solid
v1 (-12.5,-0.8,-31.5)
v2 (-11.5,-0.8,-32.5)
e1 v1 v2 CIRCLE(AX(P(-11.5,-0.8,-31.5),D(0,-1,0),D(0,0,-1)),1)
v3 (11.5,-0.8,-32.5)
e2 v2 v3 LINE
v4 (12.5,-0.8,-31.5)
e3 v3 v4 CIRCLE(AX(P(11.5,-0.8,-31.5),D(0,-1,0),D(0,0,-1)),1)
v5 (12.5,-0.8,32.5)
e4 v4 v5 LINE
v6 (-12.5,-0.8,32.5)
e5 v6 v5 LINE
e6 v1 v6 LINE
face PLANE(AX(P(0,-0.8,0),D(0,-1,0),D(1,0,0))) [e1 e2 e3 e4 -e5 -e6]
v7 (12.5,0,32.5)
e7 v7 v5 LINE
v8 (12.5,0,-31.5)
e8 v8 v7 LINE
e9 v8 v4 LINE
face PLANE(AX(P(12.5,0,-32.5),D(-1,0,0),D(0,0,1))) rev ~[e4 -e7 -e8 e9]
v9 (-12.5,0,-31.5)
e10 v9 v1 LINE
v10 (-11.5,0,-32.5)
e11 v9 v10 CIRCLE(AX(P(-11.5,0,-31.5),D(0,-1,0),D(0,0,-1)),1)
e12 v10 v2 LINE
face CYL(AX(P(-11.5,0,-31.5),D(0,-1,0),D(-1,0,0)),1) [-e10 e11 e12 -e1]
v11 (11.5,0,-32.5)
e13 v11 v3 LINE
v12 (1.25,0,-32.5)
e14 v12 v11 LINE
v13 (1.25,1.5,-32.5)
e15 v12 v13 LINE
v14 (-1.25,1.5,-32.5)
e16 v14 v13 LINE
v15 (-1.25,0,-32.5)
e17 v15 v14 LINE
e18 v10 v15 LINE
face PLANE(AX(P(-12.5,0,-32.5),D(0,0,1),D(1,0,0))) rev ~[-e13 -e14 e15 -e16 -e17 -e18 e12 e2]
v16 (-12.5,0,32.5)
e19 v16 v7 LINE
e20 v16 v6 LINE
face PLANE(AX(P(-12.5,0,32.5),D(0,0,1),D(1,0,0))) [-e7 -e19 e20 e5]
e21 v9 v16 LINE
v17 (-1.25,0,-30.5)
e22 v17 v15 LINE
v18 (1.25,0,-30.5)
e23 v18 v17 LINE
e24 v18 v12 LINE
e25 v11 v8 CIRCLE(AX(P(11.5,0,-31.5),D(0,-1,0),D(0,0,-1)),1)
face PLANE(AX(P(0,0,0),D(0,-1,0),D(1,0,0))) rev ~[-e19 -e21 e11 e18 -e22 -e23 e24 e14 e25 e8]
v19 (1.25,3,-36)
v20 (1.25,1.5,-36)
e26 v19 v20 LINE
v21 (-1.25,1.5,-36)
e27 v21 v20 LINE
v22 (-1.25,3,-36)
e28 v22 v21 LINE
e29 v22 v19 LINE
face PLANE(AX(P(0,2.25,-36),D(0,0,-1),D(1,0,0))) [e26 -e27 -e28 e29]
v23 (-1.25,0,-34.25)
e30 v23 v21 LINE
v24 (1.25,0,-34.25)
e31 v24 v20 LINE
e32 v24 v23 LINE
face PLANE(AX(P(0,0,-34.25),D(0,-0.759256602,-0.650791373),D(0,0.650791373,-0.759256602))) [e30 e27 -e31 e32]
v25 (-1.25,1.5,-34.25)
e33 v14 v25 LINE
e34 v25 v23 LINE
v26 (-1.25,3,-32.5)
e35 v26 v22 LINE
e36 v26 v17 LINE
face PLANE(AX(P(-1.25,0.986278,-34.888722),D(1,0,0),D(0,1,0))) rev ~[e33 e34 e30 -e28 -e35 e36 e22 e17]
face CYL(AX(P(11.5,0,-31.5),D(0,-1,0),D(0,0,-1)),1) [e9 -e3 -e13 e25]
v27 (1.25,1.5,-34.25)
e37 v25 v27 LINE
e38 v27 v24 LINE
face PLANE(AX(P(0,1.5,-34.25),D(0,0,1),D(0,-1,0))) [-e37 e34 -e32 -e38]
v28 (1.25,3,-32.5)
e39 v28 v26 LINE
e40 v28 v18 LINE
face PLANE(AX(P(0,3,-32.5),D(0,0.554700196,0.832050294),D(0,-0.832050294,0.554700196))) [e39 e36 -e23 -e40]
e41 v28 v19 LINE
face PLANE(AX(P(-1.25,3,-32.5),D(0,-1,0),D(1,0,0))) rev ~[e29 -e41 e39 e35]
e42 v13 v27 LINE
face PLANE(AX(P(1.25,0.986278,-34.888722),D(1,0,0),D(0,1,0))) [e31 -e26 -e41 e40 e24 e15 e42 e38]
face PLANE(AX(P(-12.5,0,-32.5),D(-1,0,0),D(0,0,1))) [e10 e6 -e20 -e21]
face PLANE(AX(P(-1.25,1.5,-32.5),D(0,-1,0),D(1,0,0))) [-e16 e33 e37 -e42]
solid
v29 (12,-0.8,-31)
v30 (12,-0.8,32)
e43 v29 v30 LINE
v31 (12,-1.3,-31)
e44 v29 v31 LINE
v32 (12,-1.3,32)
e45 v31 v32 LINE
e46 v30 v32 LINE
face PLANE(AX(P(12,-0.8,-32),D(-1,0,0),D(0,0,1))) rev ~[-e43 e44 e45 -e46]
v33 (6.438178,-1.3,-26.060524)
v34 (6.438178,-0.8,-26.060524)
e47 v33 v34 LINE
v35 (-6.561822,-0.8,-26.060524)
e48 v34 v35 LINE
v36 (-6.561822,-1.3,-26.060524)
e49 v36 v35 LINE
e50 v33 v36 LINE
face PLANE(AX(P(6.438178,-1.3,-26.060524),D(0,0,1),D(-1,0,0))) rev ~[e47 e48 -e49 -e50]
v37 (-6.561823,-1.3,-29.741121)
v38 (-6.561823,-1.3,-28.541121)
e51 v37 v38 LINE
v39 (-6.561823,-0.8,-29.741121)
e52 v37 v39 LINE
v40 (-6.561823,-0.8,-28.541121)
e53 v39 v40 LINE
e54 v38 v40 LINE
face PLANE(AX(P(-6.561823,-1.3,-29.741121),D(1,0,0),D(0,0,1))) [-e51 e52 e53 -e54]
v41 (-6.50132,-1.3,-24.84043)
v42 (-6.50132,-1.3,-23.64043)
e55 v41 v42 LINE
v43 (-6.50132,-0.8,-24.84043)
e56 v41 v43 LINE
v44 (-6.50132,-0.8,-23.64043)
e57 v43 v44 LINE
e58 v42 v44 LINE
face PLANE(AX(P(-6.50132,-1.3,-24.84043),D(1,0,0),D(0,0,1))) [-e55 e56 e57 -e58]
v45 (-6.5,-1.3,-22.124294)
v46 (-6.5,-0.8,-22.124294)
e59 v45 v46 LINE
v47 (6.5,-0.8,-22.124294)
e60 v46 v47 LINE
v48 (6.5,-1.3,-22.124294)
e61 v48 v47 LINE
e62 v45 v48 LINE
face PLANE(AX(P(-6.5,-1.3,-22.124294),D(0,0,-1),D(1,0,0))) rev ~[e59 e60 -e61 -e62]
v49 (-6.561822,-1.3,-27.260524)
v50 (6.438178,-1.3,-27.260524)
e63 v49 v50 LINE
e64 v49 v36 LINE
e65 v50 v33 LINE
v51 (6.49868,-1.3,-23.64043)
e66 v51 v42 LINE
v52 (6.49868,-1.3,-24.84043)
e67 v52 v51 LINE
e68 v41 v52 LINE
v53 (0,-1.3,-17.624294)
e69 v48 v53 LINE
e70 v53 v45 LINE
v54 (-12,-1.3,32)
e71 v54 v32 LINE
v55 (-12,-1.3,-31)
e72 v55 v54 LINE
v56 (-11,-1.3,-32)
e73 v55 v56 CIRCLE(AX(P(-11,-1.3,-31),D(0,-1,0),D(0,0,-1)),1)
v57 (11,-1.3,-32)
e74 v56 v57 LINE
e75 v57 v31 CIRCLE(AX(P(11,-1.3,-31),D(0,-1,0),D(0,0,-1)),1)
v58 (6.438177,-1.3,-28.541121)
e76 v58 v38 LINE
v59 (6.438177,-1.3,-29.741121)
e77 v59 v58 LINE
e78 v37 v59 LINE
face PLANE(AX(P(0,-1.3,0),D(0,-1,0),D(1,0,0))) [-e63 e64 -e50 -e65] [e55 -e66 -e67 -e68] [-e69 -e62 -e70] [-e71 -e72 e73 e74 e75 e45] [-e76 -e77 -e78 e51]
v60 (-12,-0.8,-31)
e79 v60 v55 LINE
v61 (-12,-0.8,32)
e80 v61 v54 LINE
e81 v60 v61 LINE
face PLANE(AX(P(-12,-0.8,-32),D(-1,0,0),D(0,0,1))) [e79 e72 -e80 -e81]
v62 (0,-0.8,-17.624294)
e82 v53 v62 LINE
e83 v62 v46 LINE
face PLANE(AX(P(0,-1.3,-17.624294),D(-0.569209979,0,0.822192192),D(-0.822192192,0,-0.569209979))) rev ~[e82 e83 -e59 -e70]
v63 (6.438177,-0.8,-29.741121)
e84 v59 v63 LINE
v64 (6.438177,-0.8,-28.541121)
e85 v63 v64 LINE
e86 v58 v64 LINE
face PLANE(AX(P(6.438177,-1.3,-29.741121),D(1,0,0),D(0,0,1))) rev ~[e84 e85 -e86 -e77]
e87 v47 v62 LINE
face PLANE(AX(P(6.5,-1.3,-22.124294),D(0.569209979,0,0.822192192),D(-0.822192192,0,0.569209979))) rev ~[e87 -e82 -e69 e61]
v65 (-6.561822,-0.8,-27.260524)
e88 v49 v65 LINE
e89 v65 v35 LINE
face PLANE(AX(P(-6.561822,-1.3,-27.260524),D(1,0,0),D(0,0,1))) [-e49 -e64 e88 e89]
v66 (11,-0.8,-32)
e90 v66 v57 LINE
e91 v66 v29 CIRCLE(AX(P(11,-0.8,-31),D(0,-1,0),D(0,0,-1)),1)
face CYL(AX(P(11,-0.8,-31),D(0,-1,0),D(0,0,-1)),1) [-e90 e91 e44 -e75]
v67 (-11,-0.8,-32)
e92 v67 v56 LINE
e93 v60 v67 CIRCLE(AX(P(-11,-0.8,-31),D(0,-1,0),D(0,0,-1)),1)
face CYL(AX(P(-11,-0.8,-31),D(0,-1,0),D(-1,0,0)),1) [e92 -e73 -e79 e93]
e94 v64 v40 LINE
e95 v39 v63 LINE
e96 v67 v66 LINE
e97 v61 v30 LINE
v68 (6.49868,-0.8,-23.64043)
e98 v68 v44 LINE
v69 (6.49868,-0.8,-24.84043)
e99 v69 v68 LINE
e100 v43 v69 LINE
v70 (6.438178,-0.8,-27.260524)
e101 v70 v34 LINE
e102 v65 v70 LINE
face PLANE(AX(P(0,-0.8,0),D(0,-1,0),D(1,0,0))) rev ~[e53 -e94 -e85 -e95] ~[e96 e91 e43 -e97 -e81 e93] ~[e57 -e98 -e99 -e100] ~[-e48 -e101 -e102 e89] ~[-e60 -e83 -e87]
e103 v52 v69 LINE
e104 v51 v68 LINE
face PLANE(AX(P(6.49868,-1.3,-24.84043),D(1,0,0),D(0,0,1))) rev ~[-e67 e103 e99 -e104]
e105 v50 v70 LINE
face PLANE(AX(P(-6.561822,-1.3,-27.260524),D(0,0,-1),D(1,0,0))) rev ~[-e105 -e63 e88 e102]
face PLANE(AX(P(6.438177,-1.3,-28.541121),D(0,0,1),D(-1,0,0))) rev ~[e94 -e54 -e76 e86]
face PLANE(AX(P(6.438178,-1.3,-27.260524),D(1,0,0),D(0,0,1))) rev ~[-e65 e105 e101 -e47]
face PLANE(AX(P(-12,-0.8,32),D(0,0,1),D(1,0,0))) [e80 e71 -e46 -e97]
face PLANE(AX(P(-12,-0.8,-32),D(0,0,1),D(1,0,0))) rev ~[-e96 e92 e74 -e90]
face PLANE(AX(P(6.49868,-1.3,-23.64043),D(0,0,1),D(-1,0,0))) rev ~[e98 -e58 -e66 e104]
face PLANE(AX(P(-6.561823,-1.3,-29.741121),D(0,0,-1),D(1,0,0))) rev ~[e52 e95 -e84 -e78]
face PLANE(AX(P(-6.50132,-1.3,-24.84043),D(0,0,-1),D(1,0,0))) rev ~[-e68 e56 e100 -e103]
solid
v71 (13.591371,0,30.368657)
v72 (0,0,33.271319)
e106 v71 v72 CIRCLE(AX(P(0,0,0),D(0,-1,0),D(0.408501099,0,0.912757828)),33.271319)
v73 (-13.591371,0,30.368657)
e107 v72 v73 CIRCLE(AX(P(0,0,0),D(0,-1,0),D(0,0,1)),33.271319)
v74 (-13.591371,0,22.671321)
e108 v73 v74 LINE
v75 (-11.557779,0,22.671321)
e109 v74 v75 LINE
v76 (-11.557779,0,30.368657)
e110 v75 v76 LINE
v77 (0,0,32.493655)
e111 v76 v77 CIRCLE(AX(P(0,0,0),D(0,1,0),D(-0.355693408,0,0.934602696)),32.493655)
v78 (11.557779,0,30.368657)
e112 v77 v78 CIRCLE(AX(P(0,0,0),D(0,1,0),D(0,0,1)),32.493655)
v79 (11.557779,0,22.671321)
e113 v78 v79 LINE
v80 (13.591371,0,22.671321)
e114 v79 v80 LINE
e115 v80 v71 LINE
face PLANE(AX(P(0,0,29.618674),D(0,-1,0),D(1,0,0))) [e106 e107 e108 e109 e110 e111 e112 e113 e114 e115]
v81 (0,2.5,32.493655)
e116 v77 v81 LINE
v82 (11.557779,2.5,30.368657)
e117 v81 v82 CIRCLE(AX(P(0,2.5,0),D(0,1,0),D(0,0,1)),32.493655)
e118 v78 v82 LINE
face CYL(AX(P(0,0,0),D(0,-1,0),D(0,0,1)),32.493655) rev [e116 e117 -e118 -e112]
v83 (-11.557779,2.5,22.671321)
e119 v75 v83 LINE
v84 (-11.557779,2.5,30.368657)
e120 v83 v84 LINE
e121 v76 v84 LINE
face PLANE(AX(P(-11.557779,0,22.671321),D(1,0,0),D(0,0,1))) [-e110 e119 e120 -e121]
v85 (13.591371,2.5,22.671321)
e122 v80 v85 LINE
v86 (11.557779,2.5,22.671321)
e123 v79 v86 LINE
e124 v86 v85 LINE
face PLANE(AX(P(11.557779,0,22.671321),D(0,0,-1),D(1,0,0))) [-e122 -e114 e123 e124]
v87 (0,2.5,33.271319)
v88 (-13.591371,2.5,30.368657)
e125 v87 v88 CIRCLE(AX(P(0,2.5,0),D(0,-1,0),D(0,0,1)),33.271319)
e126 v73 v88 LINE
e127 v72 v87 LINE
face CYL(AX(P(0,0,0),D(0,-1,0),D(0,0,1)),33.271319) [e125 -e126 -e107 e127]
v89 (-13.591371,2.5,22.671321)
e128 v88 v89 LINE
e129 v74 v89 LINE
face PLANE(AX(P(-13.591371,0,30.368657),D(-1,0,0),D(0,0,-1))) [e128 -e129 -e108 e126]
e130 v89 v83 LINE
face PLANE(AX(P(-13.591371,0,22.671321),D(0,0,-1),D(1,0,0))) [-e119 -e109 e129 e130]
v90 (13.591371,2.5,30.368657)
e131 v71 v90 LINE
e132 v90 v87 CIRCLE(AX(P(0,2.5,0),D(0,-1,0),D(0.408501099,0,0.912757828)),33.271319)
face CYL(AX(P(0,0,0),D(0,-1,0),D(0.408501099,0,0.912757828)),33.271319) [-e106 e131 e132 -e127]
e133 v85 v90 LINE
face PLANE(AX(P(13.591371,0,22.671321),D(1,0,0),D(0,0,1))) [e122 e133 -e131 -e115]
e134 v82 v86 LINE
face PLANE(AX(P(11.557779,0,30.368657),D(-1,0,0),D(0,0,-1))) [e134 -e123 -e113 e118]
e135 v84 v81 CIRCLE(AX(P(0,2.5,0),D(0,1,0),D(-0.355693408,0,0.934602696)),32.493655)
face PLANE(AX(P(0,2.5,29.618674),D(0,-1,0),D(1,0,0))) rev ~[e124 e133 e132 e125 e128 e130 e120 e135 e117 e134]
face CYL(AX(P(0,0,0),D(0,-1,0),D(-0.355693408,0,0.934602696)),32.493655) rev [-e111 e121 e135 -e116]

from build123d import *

# Parameters (mm, degrees)
F0_W      = 25
F0_H      = 65
F1_DEPTH  = 0.8
F2_W      = 24
F2_H      = 64
F3_DEPTH  = 0.5
F4_R      = 1
F4_2_R    = 1
F5_W      = 6.5
F5_H      = 1.2
F6_DEPTH  = 0.7
F8_DEPTH  = 1.25
F9_W      = 2.5
F9_H      = 1.5
F10_DEPTH = 3.5
F12_DEPTH = 1.25
F14_DEPTH = 2.5


with BuildPart() as f1:
    # F0 (on Front) → F1 (new body)
    with BuildSketch(Plane.XZ):
        Rectangle(F0_W, F0_H)
    extrude(amount=F1_DEPTH)

    # F4
    f4_edges = [f1.edges().sort_by_distance(p)[0] for p in [
        (12.5, -0.4, -32.5),
        (-12.5, -0.4, -32.5),
    ]]
    fillet(f4_edges, radius=F4_R)

    # F7 (on Right) → F8 (join, symmetric)
    with BuildSketch(Plane.YZ):
        Polygon((0, -30.5), (0, -32.5), (3, -32.5), align=None)
    extrude(amount=F8_DEPTH, both=True)

    # F9 (on face) → F10 (join)
    with BuildSketch(Plane(origin=(0, 0, -32.5), x_dir=(1, 0, 0), z_dir=(0, 0, -1))):
        with Locations((0, -2.25)):
            Rectangle(F9_W, F9_H)
    extrude(amount=F10_DEPTH)

    # F11 (on Right) → F12 (join, symmetric)
    with BuildSketch(Plane.YZ):
        Polygon((1.5, -36), (1.5, -34.25), (0, -34.25), align=None)
    extrude(amount=F12_DEPTH, both=True)


with BuildPart() as f3:
    # F2 (on face) → F3 (new body)
    with BuildSketch(Plane.XZ.offset(0.8)):
        Rectangle(F2_W, F2_H)
    extrude(amount=F3_DEPTH)

    # F4#2
    f4_2_edges = [f3.edges().sort_by_distance(p)[0] for p in [
        (12, -1.05, -32),
        (-12, -1.05, -32),
    ]]
    fillet(f4_2_edges, radius=F4_2_R)

    # F5 (on face) → F6 (cut)
    with BuildSketch(Plane.XZ.offset(1.3)):
        Polygon((-6.5, -22.1242941916), (0, -22.1242941916), (6.5, -22.1242941916), (0, -17.6242941916), align=None)
        with Locations((-3.2513196841, -24.2404304445)):
            Rectangle(F5_W, F5_H)
        with Locations((3.2486803159, -24.2404304445)):
            Rectangle(F5_W, F5_H)
        with Locations((3.1881782691, -26.6605243087)):
            Rectangle(F5_W, F5_H)
        with Locations((-3.3118217309, -26.6605243087)):
            Rectangle(F5_W, F5_H)
        with Locations((-3.3118230551, -29.1411206126)):
            Rectangle(F5_W, F5_H)
        with Locations((3.1881769449, -29.1411206126)):
            Rectangle(F5_W, F5_H)
    extrude(amount=-F6_DEPTH, mode=Mode.SUBTRACT)


with BuildPart() as f14:
    # F13 (on Front) → F14 (new body)
    with BuildSketch(Plane.XZ):
        with BuildLine():
            ThreePointArc((-11.557778761, 30.3686572288), (-5.8757523748, 31.957990015), (0, 32.4936546385))
            ThreePointArc((0, 32.4936546385), (5.8757523748, 31.957990015), (11.557778761, 30.3686572288))
            Line((11.557778761, 30.3686572288), (11.557778761, 22.671321407))
            Line((11.557778761, 22.671321407), (13.5913705453, 22.671321407))
            Line((13.5913705453, 22.671321407), (13.5913705453, 30.3686572288))
            ThreePointArc((13.5913705453, 30.3686572288), (6.9489351887, 32.5375628301), (0, 33.2713194085))
            ThreePointArc((0, 33.2713194085), (-6.9489351887, 32.5375628301), (-13.5913705453, 30.3686572288))
            Line((-13.5913705453, 30.3686572288), (-13.5913705453, 22.671321407))
            Line((-13.5913705453, 22.671321407), (-11.557778761, 22.671321407))
            Line((-11.557778761, 22.671321407), (-11.557778761, 30.3686572288))
        make_face()
    extrude(amount=-F14_DEPTH)


solid = Compound([f1.part, f3.part, f14.part])
